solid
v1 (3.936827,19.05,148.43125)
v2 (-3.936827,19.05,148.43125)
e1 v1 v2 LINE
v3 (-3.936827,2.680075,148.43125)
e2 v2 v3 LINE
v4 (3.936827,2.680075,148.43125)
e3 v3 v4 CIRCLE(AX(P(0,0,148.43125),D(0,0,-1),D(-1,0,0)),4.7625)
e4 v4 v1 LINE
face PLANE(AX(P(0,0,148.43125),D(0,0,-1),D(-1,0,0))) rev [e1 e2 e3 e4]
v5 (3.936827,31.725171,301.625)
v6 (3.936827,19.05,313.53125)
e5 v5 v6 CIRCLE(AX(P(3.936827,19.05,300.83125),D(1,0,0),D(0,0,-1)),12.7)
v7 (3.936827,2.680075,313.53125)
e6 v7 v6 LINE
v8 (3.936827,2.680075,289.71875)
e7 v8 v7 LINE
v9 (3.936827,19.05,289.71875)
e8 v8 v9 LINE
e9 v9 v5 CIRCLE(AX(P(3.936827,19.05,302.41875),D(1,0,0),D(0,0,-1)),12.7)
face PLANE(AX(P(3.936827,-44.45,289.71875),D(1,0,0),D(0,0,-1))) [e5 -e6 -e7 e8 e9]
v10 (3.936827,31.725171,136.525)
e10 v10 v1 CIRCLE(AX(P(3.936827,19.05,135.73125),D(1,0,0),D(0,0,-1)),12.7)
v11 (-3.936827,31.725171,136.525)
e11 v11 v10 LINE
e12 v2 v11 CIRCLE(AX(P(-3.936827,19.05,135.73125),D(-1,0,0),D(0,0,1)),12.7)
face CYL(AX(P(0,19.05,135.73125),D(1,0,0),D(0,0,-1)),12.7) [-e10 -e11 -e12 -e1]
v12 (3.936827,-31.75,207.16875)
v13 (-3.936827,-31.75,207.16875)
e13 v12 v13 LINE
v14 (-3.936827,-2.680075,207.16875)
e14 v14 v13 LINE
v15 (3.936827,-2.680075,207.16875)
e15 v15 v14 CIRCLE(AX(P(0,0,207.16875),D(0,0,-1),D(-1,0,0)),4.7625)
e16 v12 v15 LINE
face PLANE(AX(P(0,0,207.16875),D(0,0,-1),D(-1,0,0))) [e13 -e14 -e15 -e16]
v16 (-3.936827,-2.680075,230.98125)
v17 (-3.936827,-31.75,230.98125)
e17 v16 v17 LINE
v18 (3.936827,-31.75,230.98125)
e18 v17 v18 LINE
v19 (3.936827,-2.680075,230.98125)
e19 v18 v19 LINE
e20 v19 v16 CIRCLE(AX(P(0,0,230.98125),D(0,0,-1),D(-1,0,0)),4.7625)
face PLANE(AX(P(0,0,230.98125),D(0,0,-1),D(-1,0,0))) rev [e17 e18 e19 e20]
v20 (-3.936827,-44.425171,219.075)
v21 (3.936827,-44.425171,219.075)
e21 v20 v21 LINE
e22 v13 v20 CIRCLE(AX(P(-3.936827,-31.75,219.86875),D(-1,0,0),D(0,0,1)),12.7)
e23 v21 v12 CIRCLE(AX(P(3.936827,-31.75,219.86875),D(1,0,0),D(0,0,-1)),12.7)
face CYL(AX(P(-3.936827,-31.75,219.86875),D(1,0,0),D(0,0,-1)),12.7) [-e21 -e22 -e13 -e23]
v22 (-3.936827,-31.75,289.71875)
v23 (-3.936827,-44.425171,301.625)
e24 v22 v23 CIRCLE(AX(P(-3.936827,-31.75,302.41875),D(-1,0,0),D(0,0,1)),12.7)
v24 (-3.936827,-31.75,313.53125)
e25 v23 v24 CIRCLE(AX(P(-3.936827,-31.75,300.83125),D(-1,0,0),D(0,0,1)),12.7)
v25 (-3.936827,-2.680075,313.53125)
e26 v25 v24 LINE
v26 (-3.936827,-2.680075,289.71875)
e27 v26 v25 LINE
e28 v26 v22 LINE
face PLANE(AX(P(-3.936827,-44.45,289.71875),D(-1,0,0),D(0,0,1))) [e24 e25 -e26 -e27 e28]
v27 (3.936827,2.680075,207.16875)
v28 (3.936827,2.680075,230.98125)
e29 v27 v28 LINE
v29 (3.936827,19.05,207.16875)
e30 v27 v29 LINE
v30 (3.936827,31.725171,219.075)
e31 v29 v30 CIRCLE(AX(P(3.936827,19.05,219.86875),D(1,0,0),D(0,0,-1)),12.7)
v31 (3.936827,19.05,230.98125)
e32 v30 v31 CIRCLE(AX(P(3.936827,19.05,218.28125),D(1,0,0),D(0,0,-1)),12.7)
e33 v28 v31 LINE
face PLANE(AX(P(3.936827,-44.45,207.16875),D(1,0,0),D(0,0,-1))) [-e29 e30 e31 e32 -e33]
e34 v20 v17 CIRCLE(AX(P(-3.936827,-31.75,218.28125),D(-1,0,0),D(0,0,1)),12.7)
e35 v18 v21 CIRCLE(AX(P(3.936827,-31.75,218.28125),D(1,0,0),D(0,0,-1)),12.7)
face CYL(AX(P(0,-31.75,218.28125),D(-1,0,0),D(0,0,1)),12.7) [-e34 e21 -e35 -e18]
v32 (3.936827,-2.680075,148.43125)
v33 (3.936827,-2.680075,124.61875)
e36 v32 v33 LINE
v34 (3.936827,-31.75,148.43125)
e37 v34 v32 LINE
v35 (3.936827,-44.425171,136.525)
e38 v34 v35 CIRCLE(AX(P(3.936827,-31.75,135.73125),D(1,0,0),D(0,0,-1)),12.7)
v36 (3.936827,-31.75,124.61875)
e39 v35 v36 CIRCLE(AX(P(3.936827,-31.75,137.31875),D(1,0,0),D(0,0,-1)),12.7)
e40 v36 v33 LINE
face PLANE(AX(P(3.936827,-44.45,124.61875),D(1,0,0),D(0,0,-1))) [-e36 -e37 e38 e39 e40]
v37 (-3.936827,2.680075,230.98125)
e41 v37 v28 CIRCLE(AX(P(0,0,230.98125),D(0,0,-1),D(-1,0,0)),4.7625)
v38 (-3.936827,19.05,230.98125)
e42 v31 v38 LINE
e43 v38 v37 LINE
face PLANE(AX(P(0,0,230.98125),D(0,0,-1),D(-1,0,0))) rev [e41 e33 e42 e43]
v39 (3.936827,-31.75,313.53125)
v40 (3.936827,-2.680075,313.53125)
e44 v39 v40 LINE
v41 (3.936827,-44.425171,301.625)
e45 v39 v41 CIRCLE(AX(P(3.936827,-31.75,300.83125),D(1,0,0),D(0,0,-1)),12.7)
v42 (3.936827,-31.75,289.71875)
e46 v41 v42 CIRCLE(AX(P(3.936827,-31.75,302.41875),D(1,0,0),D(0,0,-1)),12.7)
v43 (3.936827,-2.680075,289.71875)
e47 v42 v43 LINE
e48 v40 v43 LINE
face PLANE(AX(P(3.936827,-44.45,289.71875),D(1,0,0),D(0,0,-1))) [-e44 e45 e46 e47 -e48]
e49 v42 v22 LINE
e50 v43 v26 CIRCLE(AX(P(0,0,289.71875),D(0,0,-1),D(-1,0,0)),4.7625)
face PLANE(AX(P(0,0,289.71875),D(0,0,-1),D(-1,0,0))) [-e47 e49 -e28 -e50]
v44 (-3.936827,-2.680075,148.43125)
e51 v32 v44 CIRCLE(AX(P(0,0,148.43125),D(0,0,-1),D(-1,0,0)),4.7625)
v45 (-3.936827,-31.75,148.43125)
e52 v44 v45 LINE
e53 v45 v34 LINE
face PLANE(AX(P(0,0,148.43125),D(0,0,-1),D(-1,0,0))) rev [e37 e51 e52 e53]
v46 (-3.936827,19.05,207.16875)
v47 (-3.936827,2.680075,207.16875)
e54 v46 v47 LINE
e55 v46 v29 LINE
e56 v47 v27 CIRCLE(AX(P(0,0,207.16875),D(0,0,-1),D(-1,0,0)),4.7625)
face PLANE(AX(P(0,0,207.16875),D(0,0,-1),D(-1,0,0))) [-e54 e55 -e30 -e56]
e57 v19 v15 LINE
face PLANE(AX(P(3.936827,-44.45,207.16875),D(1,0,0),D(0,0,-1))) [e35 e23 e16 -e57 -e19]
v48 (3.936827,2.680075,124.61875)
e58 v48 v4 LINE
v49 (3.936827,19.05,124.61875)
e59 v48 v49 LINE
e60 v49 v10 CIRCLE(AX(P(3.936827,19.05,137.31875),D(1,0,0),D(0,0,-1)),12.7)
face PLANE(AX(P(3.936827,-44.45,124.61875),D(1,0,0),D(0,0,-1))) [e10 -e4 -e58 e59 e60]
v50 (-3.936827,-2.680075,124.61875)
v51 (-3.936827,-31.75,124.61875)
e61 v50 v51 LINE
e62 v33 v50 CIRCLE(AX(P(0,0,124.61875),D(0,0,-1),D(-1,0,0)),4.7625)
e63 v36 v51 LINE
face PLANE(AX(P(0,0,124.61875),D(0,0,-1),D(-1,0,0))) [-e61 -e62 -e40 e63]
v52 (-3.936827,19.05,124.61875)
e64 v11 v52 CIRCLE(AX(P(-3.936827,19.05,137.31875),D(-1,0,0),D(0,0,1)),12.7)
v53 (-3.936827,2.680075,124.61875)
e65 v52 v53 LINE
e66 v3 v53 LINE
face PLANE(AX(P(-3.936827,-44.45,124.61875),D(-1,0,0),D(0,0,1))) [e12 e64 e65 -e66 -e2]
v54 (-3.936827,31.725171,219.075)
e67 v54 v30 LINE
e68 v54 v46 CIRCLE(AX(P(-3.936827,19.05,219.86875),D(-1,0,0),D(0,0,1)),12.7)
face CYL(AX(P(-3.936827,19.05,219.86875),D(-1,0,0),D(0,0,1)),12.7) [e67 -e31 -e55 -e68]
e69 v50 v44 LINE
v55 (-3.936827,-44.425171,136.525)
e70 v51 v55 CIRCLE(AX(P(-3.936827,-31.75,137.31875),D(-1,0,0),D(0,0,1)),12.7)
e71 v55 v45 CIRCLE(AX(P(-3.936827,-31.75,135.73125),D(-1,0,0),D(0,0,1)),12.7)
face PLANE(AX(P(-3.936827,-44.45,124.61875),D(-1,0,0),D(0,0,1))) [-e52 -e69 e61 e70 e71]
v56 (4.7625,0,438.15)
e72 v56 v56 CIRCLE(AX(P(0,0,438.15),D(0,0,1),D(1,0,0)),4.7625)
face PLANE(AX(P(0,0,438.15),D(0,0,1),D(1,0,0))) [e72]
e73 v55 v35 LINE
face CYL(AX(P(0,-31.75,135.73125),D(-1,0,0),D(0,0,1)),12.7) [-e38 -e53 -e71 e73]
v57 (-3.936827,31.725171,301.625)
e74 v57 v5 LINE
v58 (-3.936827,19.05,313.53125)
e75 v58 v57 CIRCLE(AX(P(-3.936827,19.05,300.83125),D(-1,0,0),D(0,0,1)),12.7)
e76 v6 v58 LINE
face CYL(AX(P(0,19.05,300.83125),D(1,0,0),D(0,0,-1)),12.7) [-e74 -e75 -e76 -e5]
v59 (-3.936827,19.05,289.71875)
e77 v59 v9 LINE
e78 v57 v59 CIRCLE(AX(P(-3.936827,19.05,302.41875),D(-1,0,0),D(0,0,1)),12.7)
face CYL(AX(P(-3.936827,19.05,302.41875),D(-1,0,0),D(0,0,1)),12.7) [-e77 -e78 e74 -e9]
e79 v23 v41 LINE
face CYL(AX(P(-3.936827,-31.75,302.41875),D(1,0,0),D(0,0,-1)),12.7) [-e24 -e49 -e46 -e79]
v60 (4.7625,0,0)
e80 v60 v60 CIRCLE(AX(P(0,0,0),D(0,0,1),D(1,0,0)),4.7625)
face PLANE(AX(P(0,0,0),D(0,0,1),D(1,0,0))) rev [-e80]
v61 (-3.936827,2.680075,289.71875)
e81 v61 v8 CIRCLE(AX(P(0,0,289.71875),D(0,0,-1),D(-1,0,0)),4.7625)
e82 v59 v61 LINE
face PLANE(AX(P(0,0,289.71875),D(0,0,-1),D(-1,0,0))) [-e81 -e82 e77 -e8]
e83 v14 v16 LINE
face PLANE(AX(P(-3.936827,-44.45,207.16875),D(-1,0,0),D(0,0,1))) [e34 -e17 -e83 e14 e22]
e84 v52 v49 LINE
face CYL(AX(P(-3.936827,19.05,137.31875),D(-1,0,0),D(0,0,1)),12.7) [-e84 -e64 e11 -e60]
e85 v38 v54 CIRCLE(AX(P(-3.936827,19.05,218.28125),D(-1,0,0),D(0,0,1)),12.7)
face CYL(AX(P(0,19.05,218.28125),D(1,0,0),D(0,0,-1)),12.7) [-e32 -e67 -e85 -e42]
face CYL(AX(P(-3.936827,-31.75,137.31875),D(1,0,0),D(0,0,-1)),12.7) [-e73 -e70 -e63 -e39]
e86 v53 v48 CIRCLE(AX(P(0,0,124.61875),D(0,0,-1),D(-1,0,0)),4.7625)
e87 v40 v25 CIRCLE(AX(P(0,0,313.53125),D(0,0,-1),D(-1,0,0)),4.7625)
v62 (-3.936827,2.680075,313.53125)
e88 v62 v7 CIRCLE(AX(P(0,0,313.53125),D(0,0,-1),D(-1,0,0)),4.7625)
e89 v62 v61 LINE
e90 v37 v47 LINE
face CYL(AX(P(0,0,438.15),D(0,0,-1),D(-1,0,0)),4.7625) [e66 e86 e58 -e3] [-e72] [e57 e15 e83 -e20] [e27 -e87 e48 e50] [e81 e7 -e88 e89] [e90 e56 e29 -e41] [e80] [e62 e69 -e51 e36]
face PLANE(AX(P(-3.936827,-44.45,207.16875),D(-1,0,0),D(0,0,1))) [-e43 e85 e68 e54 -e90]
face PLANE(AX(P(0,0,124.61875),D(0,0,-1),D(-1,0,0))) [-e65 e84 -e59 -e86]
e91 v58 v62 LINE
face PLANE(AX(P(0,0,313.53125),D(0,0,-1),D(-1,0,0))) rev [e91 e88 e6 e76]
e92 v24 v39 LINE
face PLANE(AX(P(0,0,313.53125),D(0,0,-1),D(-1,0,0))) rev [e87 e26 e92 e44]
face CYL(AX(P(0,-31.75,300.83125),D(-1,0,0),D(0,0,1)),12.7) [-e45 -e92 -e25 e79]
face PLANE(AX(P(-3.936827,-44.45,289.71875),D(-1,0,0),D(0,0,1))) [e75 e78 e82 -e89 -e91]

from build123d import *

# Parameters (mm, degrees)
SKETCH1_R              = 4.7625
BOSS_EXTRUDE1_DEPTH    = 438.15
SKETCH2_W              = 7.873653068
SKETCH2_H              = 76.2
BOSS_EXTRUDE2_DEPTH    = 11.90625
FILLET1_R              = 12.7
LPATTERN1_COUNT        = 2
LPATTERN1_PITCH        = 82.55
LPATTERN1_COUNT_DIR2   = 2
LPATTERN1_PITCH_DIR2   = 82.55
FILLET1_OF_LPATTERN1_R = 12.7


with BuildPart() as part:
    # Sketch1 → Boss-Extrude1 (new body)
    with BuildSketch(Plane.XY):
        Circle(SKETCH1_R)
    extrude(amount=BOSS_EXTRUDE1_DEPTH)

    # Sketch2 → Boss-Extrude2 (add, symmetric)
    with BuildSketch(Plane.XY.offset(219.075)):
        with Locations((0, -6.35)):
            Rectangle(SKETCH2_W, SKETCH2_H)
    boss_extrude2 = extrude(amount=BOSS_EXTRUDE2_DEPTH, both=True)

    # Fillet1
    # the kernel refuses this fillet: 12.7 mm, written as the material it takes off along each edge
    with BuildSketch(Plane(origin=(35.686826534, 31.75, 207.16875), x_dir=(0, -1, 0), z_dir=(-1, 0, 0)), Plane(origin=(-35.686826534, -44.45, 207.16875), x_dir=(0, 1, 0), z_dir=(1, 0, 0))) as fillet1_piece_1:
        with BuildLine():
            CenterArc((FILLET1_R, FILLET1_R), FILLET1_R, 180, 90)
            Line((0, FILLET1_R), (0, 0))
            Line((0, 0), (FILLET1_R, 0))
        make_face()
    extrude(amount=71.373653068, mode=Mode.SUBTRACT)
    with BuildSketch(Plane(origin=(35.686826534, 31.75, 230.98125), x_dir=(0, -1, 0), z_dir=(-1, 0, 0)), Plane(origin=(-35.686826534, -44.45, 230.98125), x_dir=(0, 1, 0), z_dir=(1, 0, 0))) as fillet1_piece_2:
        with BuildLine():
            CenterArc((FILLET1_R, -FILLET1_R), FILLET1_R, 90, 90)
            Line((0, -FILLET1_R), (0, 0))
            Line((0, 0), (FILLET1_R, 0))
        make_face()
    extrude(amount=71.373653068, mode=Mode.SUBTRACT)

    # LPattern1: Boss-Extrude2 2 × 2
    with Locations(*[Vector(0, 0, 1) * (i * LPATTERN1_PITCH) + Vector(0, 0, -1) * (j * LPATTERN1_PITCH_DIR2) for i in range(LPATTERN1_COUNT) for j in range(LPATTERN1_COUNT_DIR2) if (i, j) != (0, 0)]):
        add(boss_extrude2)

    # Fillet1 of LPattern1
    # the kernel refuses this fillet: 12.7 mm, written as the material it takes off along each edge
    with BuildSketch(Plane(origin=(35.686826534, 31.75, 124.61875), x_dir=(0, 0, 1), z_dir=(-1, 0, 0)), Plane(origin=(35.686826534, 31.75, 289.71875), x_dir=(0, 0, 1), z_dir=(-1, 0, 0)), Plane(origin=(35.686826534, 31.75, 313.53125), x_dir=(0, -1, 0), z_dir=(-1, 0, 0)), Plane(origin=(-35.686826534, -44.45, 289.71875), x_dir=(0, 0, 1), z_dir=(1, 0, 0)), Plane(origin=(35.686826534, 31.75, 207.16875), x_dir=(0, 0, 1), z_dir=(-1, 0, 0))) as fillet1_of_lpattern1_piece_1:
        with BuildLine():
            CenterArc((FILLET1_OF_LPATTERN1_R, -FILLET1_OF_LPATTERN1_R), FILLET1_OF_LPATTERN1_R, 90, 90)
            Line((0, -FILLET1_OF_LPATTERN1_R), (0, 0))
            Line((0, 0), (FILLET1_OF_LPATTERN1_R, 0))
        make_face()
    extrude(amount=71.373653068, mode=Mode.SUBTRACT)
    with BuildSketch(Plane(origin=(35.686826534, 31.75, 148.43125), x_dir=(0, 0, -1), z_dir=(-1, 0, 0)), Plane(origin=(-35.686826534, -44.45, 148.43125), x_dir=(0, 0, -1), z_dir=(1, 0, 0)), Plane(origin=(-35.686826534, -44.45, 124.61875), x_dir=(0, 1, 0), z_dir=(1, 0, 0)), Plane(origin=(-35.686826534, -44.45, 313.53125), x_dir=(0, 0, -1), z_dir=(1, 0, 0)), Plane(origin=(35.686826534, 31.75, 230.98125), x_dir=(0, 0, -1), z_dir=(-1, 0, 0)), Plane(origin=(-35.686826534, -44.45, 230.98125), x_dir=(0, 0, -1), z_dir=(1, 0, 0)), Plane(origin=(-35.686826534, -44.45, 207.16875), x_dir=(0, 1, 0), z_dir=(1, 0, 0))) as fillet1_of_lpattern1_piece_2:
        with BuildLine():
            CenterArc((FILLET1_OF_LPATTERN1_R, FILLET1_OF_LPATTERN1_R), FILLET1_OF_LPATTERN1_R, 180, 90)
            Line((0, FILLET1_OF_LPATTERN1_R), (0, 0))
            Line((0, 0), (FILLET1_OF_LPATTERN1_R, 0))
        make_face()
    extrude(amount=71.373653068, mode=Mode.SUBTRACT)


solid = part.part
